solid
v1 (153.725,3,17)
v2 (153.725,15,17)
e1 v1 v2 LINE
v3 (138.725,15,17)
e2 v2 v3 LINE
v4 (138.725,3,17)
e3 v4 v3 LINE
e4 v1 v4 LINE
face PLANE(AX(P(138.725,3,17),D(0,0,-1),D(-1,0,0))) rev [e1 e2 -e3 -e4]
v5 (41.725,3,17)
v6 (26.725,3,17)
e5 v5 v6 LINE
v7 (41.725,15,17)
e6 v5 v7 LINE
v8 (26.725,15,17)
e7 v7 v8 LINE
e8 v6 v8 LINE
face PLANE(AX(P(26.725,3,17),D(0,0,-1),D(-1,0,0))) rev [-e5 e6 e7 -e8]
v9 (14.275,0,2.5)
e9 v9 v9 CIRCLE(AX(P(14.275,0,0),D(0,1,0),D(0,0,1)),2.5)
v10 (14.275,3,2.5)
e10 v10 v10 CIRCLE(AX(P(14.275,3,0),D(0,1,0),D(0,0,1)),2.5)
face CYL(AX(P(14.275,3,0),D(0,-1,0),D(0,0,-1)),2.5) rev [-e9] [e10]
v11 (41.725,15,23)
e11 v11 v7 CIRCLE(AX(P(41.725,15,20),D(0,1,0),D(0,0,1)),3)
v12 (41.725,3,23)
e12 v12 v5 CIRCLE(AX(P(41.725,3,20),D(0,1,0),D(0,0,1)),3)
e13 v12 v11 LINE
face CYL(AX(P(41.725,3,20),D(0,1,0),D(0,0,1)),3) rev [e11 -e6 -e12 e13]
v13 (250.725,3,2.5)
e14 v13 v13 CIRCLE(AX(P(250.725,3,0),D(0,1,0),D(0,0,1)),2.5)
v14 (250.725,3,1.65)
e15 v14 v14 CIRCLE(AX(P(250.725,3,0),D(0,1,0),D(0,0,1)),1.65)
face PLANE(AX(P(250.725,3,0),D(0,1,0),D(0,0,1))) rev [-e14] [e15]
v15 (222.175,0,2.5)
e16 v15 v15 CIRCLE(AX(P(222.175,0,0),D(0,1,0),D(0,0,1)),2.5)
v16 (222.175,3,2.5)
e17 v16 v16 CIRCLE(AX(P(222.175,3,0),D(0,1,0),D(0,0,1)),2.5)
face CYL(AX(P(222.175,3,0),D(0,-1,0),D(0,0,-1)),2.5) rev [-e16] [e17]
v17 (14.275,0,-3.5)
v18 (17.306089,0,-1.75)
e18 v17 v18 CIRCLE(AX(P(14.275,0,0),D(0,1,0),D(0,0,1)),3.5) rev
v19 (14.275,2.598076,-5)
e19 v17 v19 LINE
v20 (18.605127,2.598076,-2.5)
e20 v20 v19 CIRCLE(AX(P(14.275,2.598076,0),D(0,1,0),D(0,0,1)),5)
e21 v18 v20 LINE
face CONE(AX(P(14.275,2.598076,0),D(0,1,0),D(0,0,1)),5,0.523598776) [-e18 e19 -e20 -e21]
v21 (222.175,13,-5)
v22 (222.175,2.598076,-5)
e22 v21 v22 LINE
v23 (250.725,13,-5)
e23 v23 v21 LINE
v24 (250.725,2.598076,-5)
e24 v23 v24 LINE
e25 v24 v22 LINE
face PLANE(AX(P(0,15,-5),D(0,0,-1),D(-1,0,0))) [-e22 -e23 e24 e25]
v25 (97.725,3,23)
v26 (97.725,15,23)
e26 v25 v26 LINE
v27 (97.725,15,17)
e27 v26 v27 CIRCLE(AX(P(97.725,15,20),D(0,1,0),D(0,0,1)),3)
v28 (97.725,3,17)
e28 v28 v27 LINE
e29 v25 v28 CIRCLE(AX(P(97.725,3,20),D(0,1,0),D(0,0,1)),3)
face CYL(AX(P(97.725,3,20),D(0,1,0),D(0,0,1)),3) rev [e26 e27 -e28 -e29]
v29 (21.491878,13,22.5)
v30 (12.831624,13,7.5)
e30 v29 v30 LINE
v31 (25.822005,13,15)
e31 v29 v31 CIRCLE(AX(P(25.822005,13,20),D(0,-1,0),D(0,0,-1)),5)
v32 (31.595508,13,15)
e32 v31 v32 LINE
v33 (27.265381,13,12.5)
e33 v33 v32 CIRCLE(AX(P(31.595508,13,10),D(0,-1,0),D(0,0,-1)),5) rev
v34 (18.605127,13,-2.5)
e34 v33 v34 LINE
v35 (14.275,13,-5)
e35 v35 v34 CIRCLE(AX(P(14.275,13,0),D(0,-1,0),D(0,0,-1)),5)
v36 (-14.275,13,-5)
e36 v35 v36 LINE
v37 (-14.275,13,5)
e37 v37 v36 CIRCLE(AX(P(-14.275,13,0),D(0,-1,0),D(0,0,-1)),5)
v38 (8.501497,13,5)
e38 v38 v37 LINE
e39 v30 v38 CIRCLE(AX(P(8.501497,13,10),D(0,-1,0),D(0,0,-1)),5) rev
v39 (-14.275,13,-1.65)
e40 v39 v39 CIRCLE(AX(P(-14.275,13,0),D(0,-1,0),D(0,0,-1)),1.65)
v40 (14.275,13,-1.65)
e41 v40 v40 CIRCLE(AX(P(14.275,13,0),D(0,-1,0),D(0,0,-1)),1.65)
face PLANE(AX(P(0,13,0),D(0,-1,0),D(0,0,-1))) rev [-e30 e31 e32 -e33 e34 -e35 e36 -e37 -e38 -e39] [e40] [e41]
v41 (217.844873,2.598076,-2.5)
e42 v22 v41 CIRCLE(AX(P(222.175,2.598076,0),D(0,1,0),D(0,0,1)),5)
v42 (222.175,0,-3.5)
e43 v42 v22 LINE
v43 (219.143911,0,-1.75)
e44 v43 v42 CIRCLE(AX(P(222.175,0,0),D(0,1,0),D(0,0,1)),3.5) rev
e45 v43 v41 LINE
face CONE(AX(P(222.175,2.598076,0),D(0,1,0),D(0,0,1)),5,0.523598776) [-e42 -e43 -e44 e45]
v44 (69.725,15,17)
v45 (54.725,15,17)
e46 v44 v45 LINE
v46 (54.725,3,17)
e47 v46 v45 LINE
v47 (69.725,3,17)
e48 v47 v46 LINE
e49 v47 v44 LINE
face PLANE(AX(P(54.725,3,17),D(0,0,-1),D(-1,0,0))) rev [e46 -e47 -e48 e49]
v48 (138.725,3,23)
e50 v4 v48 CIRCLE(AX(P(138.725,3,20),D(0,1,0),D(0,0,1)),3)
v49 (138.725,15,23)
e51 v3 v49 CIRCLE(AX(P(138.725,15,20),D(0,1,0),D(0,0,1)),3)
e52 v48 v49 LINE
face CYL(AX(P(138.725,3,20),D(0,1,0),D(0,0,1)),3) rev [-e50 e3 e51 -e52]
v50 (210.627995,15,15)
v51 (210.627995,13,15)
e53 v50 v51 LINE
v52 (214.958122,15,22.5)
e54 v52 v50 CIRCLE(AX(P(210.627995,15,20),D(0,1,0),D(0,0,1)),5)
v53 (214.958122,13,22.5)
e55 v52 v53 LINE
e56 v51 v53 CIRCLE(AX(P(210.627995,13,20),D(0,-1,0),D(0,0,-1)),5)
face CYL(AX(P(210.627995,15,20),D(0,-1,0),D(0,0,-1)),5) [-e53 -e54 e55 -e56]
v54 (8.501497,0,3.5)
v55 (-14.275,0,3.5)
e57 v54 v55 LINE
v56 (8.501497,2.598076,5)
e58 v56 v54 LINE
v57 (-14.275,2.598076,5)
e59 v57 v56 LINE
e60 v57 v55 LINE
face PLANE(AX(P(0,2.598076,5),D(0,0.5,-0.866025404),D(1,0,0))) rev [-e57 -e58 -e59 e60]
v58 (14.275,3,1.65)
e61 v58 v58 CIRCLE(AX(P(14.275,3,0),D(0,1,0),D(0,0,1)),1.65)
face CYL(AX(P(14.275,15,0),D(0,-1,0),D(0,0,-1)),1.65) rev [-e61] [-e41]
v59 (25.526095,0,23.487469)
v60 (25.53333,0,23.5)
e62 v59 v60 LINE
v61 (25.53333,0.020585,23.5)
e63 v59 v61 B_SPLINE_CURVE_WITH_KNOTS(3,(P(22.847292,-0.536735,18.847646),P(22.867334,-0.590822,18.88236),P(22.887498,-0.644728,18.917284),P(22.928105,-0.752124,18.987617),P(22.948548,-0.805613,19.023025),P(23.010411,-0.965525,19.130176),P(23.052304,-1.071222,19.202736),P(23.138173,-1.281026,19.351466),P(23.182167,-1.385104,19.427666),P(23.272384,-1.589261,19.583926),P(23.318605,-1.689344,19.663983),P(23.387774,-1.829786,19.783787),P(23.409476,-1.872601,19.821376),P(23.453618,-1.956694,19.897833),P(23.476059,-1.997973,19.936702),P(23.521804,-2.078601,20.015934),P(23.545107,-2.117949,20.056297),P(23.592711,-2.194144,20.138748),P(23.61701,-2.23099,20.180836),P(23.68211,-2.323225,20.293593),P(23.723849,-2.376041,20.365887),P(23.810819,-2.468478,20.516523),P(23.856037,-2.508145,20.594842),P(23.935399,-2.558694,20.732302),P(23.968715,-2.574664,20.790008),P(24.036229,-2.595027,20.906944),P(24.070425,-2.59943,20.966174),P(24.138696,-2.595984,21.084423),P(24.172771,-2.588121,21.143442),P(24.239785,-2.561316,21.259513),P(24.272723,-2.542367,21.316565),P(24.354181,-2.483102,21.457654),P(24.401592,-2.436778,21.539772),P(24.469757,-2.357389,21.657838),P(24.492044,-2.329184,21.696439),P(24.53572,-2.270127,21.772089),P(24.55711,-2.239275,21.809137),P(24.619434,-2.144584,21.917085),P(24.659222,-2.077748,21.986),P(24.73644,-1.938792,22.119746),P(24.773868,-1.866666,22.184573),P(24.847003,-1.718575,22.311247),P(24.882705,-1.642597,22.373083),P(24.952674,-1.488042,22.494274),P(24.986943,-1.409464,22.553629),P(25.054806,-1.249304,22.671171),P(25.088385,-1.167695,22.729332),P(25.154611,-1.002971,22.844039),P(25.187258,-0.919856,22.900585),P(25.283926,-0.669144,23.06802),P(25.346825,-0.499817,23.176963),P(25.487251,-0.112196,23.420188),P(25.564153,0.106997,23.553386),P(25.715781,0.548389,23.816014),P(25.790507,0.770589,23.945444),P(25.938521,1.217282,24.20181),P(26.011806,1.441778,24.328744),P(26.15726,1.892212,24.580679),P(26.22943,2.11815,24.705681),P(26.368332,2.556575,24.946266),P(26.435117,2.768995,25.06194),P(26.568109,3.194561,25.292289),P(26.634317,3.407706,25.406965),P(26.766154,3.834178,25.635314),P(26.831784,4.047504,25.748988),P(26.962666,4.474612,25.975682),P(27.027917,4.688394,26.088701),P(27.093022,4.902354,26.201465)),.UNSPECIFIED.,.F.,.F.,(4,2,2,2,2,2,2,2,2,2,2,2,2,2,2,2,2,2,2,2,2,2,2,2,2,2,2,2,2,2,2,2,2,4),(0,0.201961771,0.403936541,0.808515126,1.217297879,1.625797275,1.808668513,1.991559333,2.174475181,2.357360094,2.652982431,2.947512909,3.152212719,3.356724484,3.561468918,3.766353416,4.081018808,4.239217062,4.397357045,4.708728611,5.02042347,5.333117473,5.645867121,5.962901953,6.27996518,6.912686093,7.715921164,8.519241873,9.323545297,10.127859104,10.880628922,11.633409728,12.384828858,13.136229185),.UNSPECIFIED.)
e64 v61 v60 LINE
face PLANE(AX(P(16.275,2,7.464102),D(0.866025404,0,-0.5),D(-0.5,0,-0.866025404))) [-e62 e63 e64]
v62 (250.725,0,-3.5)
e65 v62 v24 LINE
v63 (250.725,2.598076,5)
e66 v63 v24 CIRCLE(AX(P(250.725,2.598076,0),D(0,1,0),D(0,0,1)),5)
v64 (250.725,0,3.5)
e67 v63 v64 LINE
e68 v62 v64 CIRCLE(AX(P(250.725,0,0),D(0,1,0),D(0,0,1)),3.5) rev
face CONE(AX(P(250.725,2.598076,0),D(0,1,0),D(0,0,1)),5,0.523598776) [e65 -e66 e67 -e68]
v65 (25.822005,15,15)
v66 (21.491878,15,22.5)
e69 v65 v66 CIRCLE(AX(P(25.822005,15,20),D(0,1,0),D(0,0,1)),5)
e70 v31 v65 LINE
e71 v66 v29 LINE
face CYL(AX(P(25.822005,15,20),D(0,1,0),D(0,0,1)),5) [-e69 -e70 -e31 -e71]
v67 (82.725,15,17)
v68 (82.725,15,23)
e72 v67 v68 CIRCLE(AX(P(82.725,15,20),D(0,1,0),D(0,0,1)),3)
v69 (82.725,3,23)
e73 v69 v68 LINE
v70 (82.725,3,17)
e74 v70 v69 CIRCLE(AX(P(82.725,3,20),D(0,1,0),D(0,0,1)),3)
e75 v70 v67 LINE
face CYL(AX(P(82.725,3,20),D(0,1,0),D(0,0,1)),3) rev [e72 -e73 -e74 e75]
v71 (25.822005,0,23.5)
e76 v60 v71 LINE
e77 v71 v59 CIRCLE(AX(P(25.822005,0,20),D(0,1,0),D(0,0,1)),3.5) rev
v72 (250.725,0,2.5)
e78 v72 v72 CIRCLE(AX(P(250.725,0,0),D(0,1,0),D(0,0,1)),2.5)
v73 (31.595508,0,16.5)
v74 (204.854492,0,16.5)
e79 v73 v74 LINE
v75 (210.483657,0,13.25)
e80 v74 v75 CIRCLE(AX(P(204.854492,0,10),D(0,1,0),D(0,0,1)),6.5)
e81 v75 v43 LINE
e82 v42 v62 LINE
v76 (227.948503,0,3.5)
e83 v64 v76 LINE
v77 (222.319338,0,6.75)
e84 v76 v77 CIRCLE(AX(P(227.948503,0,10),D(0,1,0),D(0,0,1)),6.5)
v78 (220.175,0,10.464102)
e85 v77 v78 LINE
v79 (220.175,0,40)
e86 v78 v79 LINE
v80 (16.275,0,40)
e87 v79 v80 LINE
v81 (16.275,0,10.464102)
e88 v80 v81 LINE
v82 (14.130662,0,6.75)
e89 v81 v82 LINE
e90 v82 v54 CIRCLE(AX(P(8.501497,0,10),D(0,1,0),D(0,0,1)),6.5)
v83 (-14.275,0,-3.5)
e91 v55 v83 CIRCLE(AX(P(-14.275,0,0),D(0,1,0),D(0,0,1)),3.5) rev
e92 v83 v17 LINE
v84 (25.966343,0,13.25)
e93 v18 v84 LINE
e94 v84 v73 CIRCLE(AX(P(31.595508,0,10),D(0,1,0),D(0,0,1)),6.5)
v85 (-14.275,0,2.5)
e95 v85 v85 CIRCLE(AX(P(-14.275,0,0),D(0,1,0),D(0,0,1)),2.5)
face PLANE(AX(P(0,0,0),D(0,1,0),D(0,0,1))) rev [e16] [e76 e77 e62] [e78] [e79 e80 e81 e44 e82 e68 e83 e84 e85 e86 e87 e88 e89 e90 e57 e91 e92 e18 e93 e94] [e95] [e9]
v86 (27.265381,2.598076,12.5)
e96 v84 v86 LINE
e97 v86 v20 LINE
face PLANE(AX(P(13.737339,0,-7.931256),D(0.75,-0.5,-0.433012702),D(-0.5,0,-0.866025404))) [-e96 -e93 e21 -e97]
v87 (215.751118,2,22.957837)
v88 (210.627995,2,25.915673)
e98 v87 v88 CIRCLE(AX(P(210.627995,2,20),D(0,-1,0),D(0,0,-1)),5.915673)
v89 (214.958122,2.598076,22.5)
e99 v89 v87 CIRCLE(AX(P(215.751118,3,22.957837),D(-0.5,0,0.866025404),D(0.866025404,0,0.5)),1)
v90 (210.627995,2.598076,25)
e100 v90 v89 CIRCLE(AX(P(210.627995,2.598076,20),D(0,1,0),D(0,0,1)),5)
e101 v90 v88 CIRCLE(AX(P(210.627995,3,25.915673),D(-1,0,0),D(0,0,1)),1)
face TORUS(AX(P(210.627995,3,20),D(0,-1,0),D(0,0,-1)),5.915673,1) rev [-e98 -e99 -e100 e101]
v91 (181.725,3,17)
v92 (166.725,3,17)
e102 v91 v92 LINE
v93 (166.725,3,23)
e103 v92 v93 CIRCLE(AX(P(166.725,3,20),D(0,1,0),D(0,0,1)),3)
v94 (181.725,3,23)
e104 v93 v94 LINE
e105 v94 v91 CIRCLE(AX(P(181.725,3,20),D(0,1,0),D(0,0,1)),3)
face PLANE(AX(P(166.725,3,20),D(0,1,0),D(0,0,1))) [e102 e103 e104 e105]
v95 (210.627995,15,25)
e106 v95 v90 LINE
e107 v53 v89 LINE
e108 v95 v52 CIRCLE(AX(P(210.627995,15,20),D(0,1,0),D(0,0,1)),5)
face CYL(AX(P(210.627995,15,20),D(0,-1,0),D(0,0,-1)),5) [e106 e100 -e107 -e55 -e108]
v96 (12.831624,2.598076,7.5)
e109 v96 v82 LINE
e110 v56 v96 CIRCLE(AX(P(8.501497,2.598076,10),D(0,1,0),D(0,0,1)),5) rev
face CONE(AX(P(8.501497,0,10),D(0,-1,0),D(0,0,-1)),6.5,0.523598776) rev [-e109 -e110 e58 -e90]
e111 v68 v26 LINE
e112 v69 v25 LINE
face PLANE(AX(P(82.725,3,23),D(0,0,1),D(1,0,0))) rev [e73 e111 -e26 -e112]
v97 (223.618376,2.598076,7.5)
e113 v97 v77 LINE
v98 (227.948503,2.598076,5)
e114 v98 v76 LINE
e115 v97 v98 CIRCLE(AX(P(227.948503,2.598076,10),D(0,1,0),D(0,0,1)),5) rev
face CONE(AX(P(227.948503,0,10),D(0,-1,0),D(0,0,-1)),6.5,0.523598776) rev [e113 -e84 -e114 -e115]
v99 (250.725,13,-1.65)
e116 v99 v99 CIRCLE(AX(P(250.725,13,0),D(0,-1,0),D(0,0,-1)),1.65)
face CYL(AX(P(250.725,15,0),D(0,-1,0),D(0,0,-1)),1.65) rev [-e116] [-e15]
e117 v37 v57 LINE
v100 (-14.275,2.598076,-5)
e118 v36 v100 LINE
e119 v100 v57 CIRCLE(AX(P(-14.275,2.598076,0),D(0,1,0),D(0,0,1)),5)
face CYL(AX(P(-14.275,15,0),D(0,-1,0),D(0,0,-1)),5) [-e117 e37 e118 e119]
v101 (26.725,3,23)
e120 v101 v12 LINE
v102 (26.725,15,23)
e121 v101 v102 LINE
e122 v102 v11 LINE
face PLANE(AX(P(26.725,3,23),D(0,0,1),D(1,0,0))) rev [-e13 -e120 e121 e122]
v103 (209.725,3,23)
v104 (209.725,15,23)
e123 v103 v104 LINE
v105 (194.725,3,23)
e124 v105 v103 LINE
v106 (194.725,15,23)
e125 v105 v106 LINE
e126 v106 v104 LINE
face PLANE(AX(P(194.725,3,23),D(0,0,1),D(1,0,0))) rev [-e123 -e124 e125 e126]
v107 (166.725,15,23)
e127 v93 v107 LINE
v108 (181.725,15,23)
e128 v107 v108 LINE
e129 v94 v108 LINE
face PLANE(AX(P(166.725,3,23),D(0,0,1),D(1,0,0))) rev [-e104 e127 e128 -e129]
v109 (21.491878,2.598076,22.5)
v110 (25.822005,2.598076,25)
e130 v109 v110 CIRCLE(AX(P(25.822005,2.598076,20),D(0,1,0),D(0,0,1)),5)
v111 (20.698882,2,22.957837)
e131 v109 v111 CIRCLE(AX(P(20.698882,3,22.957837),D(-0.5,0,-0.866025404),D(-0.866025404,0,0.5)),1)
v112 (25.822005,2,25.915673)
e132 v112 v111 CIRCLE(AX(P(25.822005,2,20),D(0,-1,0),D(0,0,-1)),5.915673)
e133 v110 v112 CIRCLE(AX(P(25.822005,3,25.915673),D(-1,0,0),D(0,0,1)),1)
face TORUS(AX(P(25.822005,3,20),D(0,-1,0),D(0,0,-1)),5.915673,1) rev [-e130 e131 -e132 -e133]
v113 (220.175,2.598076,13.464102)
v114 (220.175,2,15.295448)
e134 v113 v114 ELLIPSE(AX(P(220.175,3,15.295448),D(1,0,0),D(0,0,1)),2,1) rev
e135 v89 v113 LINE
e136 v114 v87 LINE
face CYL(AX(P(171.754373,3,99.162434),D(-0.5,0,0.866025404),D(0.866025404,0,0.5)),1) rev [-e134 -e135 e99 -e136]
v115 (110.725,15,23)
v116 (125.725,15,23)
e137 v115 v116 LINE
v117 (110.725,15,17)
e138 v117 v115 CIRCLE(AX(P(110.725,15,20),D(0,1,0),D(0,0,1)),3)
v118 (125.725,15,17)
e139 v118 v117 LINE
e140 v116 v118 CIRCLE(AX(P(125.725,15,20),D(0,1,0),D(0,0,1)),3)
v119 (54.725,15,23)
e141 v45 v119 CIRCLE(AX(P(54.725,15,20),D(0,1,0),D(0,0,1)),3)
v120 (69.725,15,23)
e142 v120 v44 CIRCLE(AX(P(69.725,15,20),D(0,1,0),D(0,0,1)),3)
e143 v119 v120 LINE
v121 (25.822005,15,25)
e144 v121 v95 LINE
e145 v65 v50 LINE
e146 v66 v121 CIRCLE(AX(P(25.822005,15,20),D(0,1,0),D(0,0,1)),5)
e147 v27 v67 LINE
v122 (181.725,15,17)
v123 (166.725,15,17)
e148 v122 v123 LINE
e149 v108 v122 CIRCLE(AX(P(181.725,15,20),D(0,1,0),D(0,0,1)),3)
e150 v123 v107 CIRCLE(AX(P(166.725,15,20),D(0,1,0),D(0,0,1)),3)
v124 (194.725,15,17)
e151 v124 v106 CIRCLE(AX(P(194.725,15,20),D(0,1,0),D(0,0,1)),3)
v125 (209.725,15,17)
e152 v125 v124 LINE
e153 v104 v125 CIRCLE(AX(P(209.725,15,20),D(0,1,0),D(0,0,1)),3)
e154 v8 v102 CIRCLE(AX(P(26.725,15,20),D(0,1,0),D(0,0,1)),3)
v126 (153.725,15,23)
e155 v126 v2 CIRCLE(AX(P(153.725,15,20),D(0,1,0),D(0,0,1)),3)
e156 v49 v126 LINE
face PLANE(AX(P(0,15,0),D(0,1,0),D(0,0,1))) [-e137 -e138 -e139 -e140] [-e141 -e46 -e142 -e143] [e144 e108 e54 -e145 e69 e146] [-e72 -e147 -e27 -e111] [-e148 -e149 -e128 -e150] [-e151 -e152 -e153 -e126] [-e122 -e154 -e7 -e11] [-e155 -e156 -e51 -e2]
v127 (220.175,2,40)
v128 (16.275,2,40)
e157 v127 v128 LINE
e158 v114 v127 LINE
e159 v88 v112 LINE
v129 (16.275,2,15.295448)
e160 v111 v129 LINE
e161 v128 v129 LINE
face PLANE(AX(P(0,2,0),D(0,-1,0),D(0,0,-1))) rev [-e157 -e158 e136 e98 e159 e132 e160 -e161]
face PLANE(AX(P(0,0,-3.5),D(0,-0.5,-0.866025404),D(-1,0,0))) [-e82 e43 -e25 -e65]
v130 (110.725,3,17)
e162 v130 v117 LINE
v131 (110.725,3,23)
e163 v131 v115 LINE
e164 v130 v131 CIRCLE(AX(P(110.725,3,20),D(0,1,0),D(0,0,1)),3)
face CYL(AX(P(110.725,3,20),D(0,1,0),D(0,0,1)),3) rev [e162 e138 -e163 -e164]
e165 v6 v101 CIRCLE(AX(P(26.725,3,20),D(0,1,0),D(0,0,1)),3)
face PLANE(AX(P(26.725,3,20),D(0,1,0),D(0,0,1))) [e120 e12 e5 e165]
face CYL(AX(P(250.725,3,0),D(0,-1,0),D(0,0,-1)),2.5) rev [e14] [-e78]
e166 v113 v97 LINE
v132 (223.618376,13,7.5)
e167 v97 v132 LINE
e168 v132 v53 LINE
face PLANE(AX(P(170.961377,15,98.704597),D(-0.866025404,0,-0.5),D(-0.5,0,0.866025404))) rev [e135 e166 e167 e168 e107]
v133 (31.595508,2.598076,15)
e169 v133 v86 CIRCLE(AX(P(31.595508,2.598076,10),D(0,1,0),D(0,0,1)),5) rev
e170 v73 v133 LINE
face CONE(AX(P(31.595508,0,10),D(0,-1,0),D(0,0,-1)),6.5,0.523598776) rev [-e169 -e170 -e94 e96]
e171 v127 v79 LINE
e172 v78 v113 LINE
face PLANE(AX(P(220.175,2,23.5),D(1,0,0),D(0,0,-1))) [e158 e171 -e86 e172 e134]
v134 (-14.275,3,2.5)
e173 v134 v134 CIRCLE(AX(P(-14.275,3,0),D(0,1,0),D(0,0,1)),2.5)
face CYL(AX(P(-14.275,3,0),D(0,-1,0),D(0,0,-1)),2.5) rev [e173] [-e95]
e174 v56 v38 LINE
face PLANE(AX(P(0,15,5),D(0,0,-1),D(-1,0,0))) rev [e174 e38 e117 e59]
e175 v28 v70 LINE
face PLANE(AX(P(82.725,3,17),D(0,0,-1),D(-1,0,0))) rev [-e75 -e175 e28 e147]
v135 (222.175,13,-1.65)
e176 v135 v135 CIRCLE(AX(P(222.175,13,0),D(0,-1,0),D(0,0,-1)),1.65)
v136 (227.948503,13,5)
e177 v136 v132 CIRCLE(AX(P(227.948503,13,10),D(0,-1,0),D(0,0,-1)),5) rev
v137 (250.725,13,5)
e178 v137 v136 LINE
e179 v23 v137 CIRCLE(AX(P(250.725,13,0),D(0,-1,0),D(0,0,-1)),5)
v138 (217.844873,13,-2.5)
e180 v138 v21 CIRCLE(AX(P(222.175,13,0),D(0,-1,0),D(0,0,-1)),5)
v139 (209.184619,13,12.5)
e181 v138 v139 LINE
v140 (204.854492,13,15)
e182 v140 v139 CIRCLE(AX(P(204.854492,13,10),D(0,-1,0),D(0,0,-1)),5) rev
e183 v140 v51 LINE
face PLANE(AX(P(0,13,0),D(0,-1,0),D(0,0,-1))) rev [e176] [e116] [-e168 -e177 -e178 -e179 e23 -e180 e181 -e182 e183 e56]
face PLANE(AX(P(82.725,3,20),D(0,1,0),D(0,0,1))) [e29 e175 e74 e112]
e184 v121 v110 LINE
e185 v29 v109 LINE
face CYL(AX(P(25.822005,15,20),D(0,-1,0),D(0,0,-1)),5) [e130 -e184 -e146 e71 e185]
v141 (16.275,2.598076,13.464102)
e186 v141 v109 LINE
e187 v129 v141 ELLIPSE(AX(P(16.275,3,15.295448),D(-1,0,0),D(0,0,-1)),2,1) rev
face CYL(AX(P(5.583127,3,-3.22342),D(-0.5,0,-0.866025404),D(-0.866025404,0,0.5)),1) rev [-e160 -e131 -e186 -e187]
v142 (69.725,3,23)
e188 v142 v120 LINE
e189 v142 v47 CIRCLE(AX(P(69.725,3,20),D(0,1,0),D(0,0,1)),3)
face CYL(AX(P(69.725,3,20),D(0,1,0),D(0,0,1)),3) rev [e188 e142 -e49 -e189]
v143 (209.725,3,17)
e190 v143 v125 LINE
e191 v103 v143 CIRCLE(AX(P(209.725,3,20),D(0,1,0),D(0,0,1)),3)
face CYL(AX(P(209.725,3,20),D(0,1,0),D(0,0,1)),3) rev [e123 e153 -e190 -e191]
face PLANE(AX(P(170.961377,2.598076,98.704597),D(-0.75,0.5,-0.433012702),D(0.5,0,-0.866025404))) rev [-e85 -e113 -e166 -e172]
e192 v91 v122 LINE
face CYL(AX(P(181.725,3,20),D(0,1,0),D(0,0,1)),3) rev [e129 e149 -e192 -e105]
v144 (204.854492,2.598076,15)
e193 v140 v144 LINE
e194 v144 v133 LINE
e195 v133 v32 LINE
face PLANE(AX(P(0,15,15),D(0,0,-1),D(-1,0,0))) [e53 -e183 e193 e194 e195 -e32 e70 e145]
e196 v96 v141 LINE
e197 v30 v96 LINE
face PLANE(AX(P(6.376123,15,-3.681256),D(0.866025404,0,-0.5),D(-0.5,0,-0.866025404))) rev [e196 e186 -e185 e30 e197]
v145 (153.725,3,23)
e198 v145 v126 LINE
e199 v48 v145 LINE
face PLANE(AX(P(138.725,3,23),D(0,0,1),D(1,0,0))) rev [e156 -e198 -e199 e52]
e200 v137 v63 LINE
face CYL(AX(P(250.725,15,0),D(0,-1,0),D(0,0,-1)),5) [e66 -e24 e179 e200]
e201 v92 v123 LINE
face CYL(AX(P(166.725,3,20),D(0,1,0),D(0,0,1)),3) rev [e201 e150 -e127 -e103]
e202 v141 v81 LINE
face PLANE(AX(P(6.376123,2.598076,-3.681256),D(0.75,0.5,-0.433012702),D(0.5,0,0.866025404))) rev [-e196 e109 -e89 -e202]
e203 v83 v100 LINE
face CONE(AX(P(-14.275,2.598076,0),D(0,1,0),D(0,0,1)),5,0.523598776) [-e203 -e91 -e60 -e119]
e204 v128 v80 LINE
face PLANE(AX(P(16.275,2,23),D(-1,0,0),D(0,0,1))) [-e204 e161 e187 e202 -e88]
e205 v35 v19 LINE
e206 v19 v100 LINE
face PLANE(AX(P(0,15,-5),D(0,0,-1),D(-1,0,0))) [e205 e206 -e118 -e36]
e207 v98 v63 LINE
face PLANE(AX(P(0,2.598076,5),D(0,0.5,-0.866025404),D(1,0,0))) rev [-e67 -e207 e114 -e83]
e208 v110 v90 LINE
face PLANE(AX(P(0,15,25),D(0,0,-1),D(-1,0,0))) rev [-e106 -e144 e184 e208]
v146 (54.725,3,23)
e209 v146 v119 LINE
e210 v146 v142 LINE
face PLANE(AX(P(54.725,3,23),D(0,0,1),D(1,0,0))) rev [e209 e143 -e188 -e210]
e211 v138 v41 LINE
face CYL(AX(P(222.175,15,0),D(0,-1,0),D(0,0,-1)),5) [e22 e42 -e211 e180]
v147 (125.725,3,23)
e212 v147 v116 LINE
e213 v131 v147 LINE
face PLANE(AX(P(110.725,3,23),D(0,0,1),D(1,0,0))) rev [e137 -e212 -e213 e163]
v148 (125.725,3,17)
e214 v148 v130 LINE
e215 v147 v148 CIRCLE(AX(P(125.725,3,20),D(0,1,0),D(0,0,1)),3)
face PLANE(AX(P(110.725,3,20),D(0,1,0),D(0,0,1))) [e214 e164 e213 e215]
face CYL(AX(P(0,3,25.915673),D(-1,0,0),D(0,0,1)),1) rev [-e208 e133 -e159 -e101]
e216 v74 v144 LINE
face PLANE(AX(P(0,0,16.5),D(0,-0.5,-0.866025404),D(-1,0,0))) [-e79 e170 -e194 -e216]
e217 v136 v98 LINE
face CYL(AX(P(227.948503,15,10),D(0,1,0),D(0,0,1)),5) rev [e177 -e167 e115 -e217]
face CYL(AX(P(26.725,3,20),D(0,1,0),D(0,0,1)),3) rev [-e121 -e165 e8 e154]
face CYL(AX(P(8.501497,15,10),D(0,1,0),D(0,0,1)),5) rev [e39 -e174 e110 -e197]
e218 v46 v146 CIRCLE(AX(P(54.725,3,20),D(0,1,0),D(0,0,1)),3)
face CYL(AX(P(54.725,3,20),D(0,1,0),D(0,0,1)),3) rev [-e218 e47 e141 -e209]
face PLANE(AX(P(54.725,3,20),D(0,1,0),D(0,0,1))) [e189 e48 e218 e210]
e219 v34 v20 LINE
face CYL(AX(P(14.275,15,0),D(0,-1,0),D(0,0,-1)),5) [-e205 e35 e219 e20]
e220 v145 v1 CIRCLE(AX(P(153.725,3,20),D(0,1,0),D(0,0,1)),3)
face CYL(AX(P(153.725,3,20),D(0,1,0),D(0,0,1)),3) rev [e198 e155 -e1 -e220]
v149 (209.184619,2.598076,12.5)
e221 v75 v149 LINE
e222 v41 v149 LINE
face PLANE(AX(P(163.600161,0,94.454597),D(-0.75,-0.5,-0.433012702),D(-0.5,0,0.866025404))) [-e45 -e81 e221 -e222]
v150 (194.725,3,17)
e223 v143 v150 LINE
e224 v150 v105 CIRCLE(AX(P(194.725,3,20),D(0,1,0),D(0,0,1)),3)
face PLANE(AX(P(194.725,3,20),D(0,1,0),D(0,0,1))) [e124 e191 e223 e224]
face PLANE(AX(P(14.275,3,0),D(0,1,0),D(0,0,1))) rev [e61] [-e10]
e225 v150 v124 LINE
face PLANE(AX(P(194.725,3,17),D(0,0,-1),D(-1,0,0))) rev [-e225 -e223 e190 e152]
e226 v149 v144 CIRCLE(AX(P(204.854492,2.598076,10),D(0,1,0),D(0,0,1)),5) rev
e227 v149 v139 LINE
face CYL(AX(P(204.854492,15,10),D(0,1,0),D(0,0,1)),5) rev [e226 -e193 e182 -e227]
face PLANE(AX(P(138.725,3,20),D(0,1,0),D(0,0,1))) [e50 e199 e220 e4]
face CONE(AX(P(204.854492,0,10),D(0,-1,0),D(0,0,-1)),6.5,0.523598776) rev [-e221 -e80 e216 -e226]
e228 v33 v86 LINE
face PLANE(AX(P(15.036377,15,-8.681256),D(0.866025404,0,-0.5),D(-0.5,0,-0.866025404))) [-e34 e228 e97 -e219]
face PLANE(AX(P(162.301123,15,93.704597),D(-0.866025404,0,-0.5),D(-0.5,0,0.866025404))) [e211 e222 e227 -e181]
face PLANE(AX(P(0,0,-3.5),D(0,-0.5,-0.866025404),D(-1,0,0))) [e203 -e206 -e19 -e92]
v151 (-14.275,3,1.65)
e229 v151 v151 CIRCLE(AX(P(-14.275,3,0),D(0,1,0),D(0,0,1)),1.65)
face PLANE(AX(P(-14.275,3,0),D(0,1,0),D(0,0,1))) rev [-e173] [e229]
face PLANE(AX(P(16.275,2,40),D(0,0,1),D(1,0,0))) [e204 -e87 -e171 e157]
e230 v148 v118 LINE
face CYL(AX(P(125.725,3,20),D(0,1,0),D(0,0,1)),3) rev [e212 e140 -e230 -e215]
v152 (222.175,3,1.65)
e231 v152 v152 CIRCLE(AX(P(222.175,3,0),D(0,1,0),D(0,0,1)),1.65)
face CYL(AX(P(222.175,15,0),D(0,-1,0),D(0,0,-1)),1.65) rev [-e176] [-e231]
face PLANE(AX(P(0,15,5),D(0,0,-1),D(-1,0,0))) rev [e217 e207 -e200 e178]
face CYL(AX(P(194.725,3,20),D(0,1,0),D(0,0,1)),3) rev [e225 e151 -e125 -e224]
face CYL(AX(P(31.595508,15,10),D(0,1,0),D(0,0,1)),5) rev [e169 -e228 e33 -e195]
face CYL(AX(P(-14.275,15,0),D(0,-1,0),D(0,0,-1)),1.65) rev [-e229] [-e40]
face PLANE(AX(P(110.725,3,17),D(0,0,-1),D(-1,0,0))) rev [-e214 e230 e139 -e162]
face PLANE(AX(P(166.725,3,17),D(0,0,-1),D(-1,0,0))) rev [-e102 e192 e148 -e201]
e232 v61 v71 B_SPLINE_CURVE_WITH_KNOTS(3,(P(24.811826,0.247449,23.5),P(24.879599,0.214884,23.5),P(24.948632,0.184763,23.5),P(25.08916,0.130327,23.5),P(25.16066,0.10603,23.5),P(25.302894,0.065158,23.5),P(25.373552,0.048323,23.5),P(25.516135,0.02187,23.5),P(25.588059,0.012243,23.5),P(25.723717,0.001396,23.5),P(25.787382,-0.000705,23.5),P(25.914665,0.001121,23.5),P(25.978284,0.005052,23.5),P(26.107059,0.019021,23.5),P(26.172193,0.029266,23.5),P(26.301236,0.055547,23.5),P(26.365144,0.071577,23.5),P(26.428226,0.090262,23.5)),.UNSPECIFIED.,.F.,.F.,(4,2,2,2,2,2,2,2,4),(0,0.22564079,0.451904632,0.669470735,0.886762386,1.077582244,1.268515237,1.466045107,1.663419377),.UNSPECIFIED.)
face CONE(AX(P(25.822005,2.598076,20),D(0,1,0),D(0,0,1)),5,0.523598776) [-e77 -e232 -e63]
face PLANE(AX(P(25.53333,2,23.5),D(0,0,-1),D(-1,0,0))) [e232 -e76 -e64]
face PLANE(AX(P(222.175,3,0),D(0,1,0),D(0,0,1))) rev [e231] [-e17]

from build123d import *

# Parameters (mm, degrees)
SKETCH_1_R                 = 1.65
EXTRUDE_1_DEPTH            = 15
FILLET_1_R                 = 5
CHAMFER_1_SIZE             = 1.5
CHAMFER_1_SIZE2            = 2.598076211
SKETCH_3_R                 = 2.5
CUT_EXTRUDE_1_DEPTH        = 3
SKETCH_4_W                 = 353.760068279
SKETCH_4_H                 = 71.916373997
CUT_EXTRUDE_2_DEPTH        = 2
FILLET_2_R                 = 5
CUT_EXTRUDE_3_DEPTH        = 12
PATTERN_LINEAR_1_COUNT     = 4
PATTERN_LINEAR_1_PITCH     = 28
PATTERN_LINEAR_1_COL_COUNT = 4
PATTERN_LINEAR_1_COL_PITCH = 28
EXTRUDE_2_DEPTH            = 2
FILLET_3_R                 = 1


# Some blends are built 0.0001 mm under size
with BuildPart() as part:
    # 草图1 → 凸台-拉伸1 (new body)
    with BuildSketch(Plane(origin=(0, 0, 0), x_dir=(1, 0, 0), z_dir=(0, 1, 0))):
        with BuildLine():
            Line((14.275, 5), (-14.275, 5))
            ThreePointArc((-14.275, 5), (-19.275, 0), (-14.275, -5))
            Line((-14.275, -5), (11.388248654, -5))
            Line((11.388248654, -5), (21.491878365, -22.5))
            ThreePointArc((21.491878365, -22.5), (23.322005384, -24.330127019), (25.822005384, -25))
            Line((25.822005384, -25), (210.627994616, -25))
            ThreePointArc((210.627994616, -25), (213.127994616, -24.330127019), (214.958121635, -22.5))
            Line((214.958121635, -22.5), (225.061751346, -5))
            Line((225.061751346, -5), (250.725, -5))
            ThreePointArc((250.725, -5), (255.725, 0), (250.725, 5))
            Line((250.725, 5), (222.175, 5))
            ThreePointArc((222.175, 5), (219.675, 4.330127019), (217.844872981, 2.5))
            Line((217.844872981, 2.5), (207.74124327, -15))
            Line((207.74124327, -15), (28.70875673, -15))
            Line((28.70875673, -15), (18.605127019, 2.5))
            ThreePointArc((18.605127019, 2.5), (16.775, 4.330127019), (14.275, 5))
        make_face()
        with Locations(Location((-14.275, 0, 0), (0, 0, 270))):
            Circle(SKETCH_1_R, mode=Mode.SUBTRACT)
        with Locations(Location((14.275, 0, 0), (0, 0, 270))):
            Circle(SKETCH_1_R, mode=Mode.SUBTRACT)
        with Locations(Location((222.175, 0, 0), (0, 0, 270))):
            Circle(SKETCH_1_R, mode=Mode.SUBTRACT)
        with Locations(Location((250.725, 0, 0), (0, 0, 270))):
            Circle(SKETCH_1_R, mode=Mode.SUBTRACT)
    extrude(amount=EXTRUDE_1_DEPTH)

    # 圆角1
    fillet_1_edges = [part.edges().sort_by_distance(p)[0] for p in [
        (225.061751346, 7.5, 5),
        (11.388248654, 7.5, 5),
        (28.70875673, 7.5, 15),
        (207.74124327, 7.5, 15),
    ]]
    fillet(fillet_1_edges, radius=FILLET_1_R)

    # 倒角1
    chamfer_1_edges = [part.edges().sort_by_distance(p)[0] for p in [
        (255.725, 0, 0),
        (219.288248654, 0, 15),
        (213.127994616, 0, 24.330127019),
        (118.225, 0, 25),
        (23.322005384, 0, 24.330127019),
        (-2.886751346, 0, 5),
        (-19.275, 0, 0),
        (0, 0, -5),
        (16.775, 0, -4.330127019),
        (22.935254038, 0, 5),
        (219.675, 0, -4.330127019),
        (236.45, 0, -5),
        (118.225, 0, 15),
        (213.514745962, 0, 5),
        (239.336751346, 0, 5),
        (17.161751346, 0, 15),
        (207.354491924, 0, 14.330127019),
        (29.095508076, 0, 14.330127019),
        (225.448502692, 0, 5.669872981),
        (11.001497308, 0, 5.669872981),
    ]]
    chamfer_1_side = [part.faces().sort_by_distance(p)[0] for p in [
        (216.892549382, 0, 13.616842381),
    ]]
    chamfer(chamfer_1_edges, length=CHAMFER_1_SIZE, length2=CHAMFER_1_SIZE2, reference=chamfer_1_side[0])

    # 草图3 → 切除-拉伸1 (cut)
    with BuildSketch(Plane(origin=(0, 0, 0), x_dir=(1, 0, 0), z_dir=(0, 1, 0))):
        with Locations(Location((-14.275, 0, 0), (0, 0, 270))):
            Circle(SKETCH_3_R)
        with Locations(Location((14.275, 0, 0), (0, 0, 270))):
            Circle(SKETCH_3_R)
        with Locations(Location((250.725, 0, 0), (0, 0, 270))):
            Circle(SKETCH_3_R)
        with Locations(Location((222.175, 0, 0), (0, 0, 270))):
            Circle(SKETCH_3_R)
    extrude(amount=CUT_EXTRUDE_1_DEPTH, mode=Mode.SUBTRACT)

    # 草图4 → 切除-拉伸2 (cut)
    with BuildSketch(Plane(origin=(0, 15, 0), x_dir=(1, 0, 0), z_dir=(0, 1, 0))):
        with Locations((127.300161481, 20.958186999)):
            Rectangle(SKETCH_4_W, SKETCH_4_H)
    extrude(amount=-CUT_EXTRUDE_2_DEPTH, mode=Mode.SUBTRACT)

    # 圆角2
    fillet_2_edges = [part.edges().sort_by_distance(p)[0] for p in [
        (17.161751346, 14, 15),
        (219.288248654, 14, 15),
    ]]
    fillet(fillet_2_edges, radius=FILLET_2_R - 0.0001)  # a hair under: the kernel refuses the full size

    # 草图5 → 切除-拉伸3 (cut)
    with BuildSketch(Plane(origin=(0, 15, 0), x_dir=(1, 0, 0), z_dir=(0, 1, 0))):
        with BuildLine():
            Line((110.725, -17), (125.725, -17))
            ThreePointArc((125.725, -17), (128.725, -20), (125.725, -23))
            Line((125.725, -23), (110.725, -23))
            ThreePointArc((110.725, -23), (107.725, -20), (110.725, -17))
        make_face()
    cut_extrude_3 = extrude(amount=-CUT_EXTRUDE_3_DEPTH, mode=Mode.SUBTRACT)

    # 阵列(线性)1: 切除-拉伸3 ×4
    with Locations(*[(i * PATTERN_LINEAR_1_PITCH, 0, 0) for i in range(1, PATTERN_LINEAR_1_COUNT)]):
        add(cut_extrude_3, mode=Mode.SUBTRACT)

    # 阵列(线性)1 col: 切除-拉伸3 ×4
    with Locations(*[(-i * PATTERN_LINEAR_1_COL_PITCH, 0, 0) for i in range(1, PATTERN_LINEAR_1_COL_COUNT)]):
        add(cut_extrude_3, mode=Mode.SUBTRACT)

    # 草图6 → 凸台-拉伸2 (add)
    with BuildSketch(Plane.XZ):
        Polygon((25.533330249, 23.5), (210.339319482, 23.5), (220.175, 6.464101615), (220.175, 23.5), (220.175, 40), (16.275, 40), (16.275, 23), (16.275, 7.464101615), align=None)
    extrude(amount=-EXTRUDE_2_DEPTH)

    # 圆角3
    # the kernel refuses this fillet: 1 mm, written as the material it adds along each edge
    with BuildSketch(Plane(origin=(214.659083529, 2, 22.327350269), x_dir=(0.4330127018948014, 0.8660254037827173, 0.2500000000014904), z_dir=(0.4999999999999995, 0, -0.866025403784439))) as fillet_3_piece_1_section:
        with BuildLine():
            CenterArc((1.496511696, 0.592034292), FILLET_3_R, 150, 66.301500994)
            Line((0.630486292, 1.092034292), (0.613165784, 1.102034292))
            Line((0.613165784, 1.102034292), (-0.017320508, 0.01))
            Line((-0.017320508, 0.01), (0, -0.02))
            ThreePointArc((0, -0.02), (0.345299462, -0.02), (0.674480668, -0.011840686))
            Line((0.674480668, -0.011840686), (0.690598923, 0))
        make_face()
    fillet_3_piece_1 = extrude(amount=14.184264403, mode=Mode.PRIVATE)
    fillet_3_piece_1 = split(fillet_3_piece_1, bisect_by=Plane(origin=(220.175, 2.148183279, 18.272519996), z_dir=(-1, 0, 0)), keep=Keep.TOP, mode=Mode.PRIVATE)
    add(fillet_3_piece_1)
    with BuildSketch(Plane(origin=(210.627994616, 2, 20), x_dir=(0, 0, 1), z_dir=(-1, 0, 0))) as fillet_3_piece_2:
        with BuildLine():
            CenterArc((5.915673123, 1), FILLET_3_R, 203.698499006, 66.301500994)
            Line((5.915673123, 0), (5.915673123, -0.02))
            Line((5.915673123, -0.02), (4.654700538, -0.02))
            Line((4.654700538, -0.02), (4.63738003, 0.01))
            ThreePointArc((4.63738003, 0.01), (4.810029761, 0.309038106), (4.981686538, 0.590037736))
            Line((4.981686538, 0.590037736), (5, 0.598076211))
        make_face()
    revolve(axis=Axis((210.627994616, 2, 20), (0, 1, 0)), revolution_arc=60)
    with BuildSketch(Plane(origin=(25.822005384, 2, 24.654700538), x_dir=(0, 0, 1), z_dir=(1, 0, 0))) as fillet_3_piece_3:
        with BuildLine():
            CenterArc((1.260972585, -1), FILLET_3_R, 90, 66.301500994)
            Line((0.345299462, -0.598076211), (0.326985999, -0.590037736))
            ThreePointArc((0.326985999, -0.590037736), (0.155329223, -0.309038106), (-0.017320508, -0.01))
            Line((-0.017320508, -0.01), (0, 0.02))
            Line((0, 0.02), (1.260972585, 0.02))
            Line((1.260972585, 0.02), (1.260972585, 0))
        make_face()
    extrude(amount=184.805989232)
    with BuildSketch(Plane(origin=(25.822005384, 2, 20), x_dir=(-0.8660254037844389, 0, 0.49999999999999944), z_dir=(-0.49999999999999944, 0, -0.8660254037844389))) as fillet_3_piece_4:
        with BuildLine():
            CenterArc((5.915673123, 1), FILLET_3_R, 203.698499006, 66.301500994)
            Line((5, 0.598076211), (4.981686538, 0.590037736))
            ThreePointArc((4.981686538, 0.590037736), (4.810029761, 0.309038106), (4.63738003, 0.01))
            Line((4.63738003, 0.01), (4.654700538, -0.02))
            Line((4.654700538, -0.02), (5.915673123, -0.02))
            Line((5.915673123, -0.02), (5.915673123, 0))
        make_face()
    revolve(axis=Axis((25.822005384, 2, 20), (0, 1, 0)), revolution_arc=60)
    with BuildSketch(Plane(origin=(14.698784269, 2, 10.043416963), x_dir=(-0.86602540378444, 0, 0.4999999999999978), z_dir=(0.4999999999999977, 0, 0.86602540378444))) as fillet_3_piece_5_section:
        with BuildLine():
            CenterArc((1.260972585, -1), FILLET_3_R, 90, 66.301500994)
            Line((0.345299462, -0.598076211), (0.326985999, -0.590037736))
            ThreePointArc((0.326985999, -0.590037736), (0.155329223, -0.309038106), (-0.017320508, -0.01))
            Line((-0.017320508, -0.01), (0, 0.02))
            Line((0, 0.02), (1.260972585, 0.02))
            Line((1.260972585, 0.02), (1.260972585, 0))
        make_face()
    fillet_3_piece_5 = extrude(amount=14.184264403, mode=Mode.PRIVATE)
    fillet_3_piece_5 = split(fillet_3_piece_5, bisect_by=Plane(origin=(16.275, 2.148183279, 18.272519996), z_dir=(1, 0, 0)), keep=Keep.TOP, mode=Mode.PRIVATE)
    add(fillet_3_piece_5)


solid = part.part
